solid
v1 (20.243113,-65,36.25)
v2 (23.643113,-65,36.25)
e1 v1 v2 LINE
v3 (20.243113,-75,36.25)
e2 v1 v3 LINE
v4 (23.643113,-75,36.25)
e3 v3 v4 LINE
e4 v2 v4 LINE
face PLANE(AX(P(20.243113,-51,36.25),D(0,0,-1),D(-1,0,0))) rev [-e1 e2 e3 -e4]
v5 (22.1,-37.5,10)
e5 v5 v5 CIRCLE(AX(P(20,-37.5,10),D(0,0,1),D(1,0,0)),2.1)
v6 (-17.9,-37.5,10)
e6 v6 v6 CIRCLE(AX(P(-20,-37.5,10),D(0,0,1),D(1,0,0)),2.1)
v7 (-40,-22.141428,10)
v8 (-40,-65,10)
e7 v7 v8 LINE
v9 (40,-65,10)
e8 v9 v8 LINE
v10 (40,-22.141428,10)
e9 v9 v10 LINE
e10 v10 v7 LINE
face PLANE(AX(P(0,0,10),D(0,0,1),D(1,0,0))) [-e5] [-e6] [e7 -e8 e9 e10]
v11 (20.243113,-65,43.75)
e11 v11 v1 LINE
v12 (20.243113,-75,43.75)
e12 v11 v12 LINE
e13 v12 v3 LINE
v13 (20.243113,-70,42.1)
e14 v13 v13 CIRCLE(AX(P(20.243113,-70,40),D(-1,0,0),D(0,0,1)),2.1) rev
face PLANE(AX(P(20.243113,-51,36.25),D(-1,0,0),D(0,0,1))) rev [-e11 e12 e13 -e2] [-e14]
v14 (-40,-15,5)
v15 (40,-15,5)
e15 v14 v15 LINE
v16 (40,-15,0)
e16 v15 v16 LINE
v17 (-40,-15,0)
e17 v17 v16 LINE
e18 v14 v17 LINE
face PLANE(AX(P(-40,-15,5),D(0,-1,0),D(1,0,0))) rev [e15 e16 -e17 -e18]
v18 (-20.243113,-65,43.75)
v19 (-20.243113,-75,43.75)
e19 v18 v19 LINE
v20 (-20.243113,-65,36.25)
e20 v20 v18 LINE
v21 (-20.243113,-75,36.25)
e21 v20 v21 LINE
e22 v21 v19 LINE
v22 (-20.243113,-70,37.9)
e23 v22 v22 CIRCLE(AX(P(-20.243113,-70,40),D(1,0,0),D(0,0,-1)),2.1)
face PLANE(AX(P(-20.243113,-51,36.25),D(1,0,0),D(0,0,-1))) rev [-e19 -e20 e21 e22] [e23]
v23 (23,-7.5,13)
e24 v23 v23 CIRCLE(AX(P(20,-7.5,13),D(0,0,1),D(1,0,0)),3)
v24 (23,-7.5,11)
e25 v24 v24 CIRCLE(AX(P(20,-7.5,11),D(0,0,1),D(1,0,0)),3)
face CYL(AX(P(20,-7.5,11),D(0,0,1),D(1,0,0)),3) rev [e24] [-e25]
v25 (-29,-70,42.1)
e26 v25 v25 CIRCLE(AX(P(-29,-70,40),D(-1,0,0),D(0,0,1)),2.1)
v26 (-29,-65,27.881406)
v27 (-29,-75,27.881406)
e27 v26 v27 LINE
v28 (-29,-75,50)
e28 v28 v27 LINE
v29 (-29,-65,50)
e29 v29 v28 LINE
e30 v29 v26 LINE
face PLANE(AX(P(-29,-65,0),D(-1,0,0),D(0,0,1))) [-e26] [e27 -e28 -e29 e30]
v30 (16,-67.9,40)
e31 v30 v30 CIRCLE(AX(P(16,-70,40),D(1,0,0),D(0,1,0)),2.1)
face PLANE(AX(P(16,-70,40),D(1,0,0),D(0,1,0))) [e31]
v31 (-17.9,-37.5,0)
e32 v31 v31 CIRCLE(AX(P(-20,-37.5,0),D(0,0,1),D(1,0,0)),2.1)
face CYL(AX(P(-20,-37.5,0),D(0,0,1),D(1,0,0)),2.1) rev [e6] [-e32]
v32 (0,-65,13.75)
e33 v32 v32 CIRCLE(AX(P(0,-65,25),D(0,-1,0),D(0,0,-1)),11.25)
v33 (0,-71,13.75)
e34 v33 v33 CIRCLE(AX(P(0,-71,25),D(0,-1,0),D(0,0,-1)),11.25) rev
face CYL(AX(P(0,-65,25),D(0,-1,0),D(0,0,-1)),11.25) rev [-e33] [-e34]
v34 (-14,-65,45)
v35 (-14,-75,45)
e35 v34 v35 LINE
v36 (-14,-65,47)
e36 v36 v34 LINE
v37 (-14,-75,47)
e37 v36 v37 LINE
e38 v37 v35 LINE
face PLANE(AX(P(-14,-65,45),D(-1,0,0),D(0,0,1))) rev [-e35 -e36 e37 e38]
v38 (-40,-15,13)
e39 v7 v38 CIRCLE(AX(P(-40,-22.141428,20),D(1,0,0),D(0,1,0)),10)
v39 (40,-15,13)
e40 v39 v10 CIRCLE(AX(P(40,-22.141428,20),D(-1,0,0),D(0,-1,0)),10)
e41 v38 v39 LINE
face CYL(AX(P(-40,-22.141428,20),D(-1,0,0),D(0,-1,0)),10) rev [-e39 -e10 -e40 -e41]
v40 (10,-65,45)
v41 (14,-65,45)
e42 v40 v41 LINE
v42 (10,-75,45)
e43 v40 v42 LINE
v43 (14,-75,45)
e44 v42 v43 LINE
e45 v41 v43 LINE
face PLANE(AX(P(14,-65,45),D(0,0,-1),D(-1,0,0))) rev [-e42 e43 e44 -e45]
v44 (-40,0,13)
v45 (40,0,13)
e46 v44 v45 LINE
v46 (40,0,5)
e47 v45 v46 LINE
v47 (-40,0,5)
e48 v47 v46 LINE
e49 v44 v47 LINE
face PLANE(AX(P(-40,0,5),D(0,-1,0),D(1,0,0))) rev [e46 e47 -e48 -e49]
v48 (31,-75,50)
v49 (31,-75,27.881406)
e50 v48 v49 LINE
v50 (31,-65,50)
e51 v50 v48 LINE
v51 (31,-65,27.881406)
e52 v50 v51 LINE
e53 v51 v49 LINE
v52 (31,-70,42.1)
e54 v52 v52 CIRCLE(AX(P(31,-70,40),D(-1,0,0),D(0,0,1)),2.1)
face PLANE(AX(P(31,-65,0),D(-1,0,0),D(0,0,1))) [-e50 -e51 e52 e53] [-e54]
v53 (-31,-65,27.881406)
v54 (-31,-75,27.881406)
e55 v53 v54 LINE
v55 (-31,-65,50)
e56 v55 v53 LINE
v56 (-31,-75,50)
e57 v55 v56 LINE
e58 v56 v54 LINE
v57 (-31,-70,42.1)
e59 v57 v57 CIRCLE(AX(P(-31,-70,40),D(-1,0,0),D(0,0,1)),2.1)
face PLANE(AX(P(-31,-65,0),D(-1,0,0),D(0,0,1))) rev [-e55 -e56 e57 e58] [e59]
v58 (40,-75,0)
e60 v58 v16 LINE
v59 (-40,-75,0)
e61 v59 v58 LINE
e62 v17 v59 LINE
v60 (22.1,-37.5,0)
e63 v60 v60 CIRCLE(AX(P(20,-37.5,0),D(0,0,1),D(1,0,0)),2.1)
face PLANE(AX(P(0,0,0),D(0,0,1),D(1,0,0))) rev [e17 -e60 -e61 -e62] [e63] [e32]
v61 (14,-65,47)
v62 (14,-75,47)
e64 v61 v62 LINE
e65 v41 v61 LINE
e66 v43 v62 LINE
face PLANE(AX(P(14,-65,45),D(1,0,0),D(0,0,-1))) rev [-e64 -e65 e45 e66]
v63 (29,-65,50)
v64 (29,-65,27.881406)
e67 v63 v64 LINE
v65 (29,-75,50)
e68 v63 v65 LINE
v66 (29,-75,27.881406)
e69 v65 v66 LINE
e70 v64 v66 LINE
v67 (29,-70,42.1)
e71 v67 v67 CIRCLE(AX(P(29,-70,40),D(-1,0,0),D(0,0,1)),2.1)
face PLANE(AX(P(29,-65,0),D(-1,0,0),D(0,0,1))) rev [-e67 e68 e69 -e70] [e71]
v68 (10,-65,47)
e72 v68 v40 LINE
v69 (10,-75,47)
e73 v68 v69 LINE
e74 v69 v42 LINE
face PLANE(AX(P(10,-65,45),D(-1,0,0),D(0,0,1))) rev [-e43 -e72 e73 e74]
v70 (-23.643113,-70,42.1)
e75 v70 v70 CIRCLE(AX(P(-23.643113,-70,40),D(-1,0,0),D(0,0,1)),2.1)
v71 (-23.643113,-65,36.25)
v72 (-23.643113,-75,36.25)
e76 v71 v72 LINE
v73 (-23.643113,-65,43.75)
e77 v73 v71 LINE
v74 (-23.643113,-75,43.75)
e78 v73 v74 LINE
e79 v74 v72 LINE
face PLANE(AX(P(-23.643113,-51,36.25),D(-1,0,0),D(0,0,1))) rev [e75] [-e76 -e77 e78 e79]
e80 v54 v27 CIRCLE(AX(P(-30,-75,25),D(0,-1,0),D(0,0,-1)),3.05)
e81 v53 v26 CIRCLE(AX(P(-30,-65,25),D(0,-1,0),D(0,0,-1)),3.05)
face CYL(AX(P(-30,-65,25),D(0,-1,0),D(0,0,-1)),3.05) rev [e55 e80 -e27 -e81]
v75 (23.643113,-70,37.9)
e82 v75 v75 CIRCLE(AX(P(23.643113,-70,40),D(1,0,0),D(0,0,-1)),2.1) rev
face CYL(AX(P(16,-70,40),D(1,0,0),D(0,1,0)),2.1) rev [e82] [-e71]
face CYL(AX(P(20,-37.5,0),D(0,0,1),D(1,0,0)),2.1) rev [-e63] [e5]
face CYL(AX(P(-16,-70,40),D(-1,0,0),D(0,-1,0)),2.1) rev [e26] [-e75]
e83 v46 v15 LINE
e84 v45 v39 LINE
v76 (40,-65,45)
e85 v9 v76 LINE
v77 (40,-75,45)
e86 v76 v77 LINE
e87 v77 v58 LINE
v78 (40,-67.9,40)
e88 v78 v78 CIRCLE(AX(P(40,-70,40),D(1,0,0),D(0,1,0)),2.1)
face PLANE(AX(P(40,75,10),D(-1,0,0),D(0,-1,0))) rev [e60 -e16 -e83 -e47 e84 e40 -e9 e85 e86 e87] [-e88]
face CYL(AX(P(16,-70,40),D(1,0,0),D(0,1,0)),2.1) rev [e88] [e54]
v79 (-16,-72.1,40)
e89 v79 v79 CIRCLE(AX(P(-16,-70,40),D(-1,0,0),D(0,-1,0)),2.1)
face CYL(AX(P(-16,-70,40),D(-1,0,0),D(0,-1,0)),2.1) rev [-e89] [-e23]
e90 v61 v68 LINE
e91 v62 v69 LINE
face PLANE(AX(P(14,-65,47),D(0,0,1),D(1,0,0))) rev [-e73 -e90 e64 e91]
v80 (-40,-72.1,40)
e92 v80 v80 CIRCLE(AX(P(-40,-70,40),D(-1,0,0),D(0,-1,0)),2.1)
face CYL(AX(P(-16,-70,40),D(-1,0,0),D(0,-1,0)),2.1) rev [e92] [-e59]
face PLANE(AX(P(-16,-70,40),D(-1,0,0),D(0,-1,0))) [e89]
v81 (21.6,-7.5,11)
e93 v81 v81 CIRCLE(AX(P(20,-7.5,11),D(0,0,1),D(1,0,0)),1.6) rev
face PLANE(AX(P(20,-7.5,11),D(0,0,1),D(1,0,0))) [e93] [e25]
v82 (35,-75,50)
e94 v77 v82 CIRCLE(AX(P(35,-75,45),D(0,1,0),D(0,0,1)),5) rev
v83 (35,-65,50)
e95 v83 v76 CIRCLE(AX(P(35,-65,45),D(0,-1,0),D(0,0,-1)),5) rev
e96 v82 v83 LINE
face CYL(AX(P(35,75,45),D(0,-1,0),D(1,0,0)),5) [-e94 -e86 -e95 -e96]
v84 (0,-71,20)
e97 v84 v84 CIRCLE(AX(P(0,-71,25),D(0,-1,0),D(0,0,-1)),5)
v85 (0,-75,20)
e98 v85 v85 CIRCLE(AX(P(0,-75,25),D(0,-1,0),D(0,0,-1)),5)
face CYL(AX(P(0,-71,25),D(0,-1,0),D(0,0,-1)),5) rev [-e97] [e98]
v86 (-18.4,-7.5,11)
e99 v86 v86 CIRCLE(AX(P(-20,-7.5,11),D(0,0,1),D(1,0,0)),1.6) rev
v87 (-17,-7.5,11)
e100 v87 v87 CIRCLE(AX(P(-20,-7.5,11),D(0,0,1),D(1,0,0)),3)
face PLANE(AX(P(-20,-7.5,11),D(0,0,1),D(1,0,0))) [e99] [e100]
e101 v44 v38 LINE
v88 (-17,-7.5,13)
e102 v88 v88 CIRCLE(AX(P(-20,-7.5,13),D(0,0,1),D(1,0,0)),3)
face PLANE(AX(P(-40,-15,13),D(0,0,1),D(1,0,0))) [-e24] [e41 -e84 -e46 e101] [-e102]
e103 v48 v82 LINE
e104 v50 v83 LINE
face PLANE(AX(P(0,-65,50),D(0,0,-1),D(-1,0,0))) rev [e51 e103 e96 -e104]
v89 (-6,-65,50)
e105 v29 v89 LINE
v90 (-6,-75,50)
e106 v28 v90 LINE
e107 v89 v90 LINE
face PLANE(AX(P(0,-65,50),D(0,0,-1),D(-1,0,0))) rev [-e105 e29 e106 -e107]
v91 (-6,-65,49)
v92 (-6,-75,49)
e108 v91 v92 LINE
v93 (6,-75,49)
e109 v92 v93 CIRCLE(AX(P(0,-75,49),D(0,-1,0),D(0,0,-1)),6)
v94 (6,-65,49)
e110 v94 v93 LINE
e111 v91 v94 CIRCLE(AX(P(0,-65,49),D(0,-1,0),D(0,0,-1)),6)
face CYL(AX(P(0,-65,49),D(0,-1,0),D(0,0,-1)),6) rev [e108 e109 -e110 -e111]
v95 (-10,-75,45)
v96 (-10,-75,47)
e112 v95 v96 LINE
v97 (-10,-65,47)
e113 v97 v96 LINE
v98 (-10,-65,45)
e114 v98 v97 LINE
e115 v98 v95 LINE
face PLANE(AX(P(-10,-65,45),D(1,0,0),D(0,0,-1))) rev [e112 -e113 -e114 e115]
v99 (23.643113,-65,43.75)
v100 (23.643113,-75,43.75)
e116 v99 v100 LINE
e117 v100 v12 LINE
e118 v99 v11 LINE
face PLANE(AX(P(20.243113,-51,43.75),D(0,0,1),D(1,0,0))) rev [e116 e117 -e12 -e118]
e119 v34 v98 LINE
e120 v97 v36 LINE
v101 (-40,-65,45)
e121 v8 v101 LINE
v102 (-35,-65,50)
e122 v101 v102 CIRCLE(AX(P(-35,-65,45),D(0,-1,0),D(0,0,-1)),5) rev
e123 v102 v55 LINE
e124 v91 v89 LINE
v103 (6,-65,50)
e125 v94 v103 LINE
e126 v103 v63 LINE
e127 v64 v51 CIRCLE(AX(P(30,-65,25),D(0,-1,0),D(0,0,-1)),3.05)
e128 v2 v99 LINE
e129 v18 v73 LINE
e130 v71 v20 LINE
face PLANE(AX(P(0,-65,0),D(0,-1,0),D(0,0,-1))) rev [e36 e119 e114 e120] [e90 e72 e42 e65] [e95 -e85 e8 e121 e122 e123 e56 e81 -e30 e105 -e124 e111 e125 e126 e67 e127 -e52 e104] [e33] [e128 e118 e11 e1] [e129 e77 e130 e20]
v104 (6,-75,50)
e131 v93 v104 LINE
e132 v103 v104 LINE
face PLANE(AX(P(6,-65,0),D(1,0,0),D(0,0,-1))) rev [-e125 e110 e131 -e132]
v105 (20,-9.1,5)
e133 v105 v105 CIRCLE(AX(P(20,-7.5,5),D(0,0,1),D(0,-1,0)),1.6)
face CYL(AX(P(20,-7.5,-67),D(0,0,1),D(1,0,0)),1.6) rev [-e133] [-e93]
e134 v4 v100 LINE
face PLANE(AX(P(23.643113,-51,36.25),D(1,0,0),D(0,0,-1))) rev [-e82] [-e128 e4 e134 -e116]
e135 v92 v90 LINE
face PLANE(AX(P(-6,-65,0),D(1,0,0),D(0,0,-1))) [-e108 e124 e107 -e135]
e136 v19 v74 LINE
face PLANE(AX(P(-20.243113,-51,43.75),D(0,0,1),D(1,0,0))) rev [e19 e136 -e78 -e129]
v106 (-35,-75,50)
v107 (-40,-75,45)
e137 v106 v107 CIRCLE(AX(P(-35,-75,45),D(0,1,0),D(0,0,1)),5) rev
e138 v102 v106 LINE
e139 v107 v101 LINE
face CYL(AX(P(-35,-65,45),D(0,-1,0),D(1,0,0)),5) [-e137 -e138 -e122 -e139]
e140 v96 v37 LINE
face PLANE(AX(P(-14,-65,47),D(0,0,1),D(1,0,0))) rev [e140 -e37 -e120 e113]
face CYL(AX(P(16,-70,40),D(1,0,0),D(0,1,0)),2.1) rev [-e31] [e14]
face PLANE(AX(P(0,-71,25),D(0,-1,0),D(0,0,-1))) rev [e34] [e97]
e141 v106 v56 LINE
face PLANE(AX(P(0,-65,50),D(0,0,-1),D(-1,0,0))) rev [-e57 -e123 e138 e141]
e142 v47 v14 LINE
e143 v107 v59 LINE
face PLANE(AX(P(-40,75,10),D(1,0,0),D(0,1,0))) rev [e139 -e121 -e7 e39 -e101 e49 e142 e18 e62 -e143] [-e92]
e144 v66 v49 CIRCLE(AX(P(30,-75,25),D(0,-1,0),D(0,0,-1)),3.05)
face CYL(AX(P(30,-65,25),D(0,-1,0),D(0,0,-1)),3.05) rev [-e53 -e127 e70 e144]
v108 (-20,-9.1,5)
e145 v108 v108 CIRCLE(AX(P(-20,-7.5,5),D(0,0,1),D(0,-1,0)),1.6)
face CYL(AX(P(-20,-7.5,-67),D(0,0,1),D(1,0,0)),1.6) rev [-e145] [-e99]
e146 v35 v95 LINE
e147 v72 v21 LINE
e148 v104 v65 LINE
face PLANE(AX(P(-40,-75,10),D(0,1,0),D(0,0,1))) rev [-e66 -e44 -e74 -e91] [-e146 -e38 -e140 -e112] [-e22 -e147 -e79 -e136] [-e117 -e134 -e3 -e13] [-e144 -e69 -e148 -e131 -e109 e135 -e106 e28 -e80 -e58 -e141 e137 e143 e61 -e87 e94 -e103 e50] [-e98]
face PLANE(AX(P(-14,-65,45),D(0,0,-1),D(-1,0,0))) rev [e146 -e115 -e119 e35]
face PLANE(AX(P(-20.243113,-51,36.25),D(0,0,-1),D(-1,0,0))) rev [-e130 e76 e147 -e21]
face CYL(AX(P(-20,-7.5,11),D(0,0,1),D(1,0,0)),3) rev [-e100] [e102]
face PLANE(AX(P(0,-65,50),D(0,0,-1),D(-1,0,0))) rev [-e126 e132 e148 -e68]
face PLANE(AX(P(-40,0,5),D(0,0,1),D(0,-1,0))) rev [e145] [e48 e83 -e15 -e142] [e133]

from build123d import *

# Parameters (mm, degrees)
SKETCH_1_W           = 80
SKETCH_1_H           = 150
EXTRUDE_1_DEPTH      = 10
SKETCH_4_R           = 11.25
EXTRUDE_3_DEPTH      = 10
SKETCH_5_R           = 11.25
SKETCH_5_R_2         = 5
EXTRUDE_4_DEPTH      = 4
SKETCH_6_R           = 2.1
CUT_EXTRUDE_1_DEPTH  = 24
SKETCH_7_W           = 3.4
SKETCH_7_H           = 7.5
CUT_EXTRUDE_2_DEPTH  = 24
CUT_EXTRUDE_START    = -24
SKETCH_8_R           = 2.1
CUT_EXTRUDE_3_DEPTH  = 24
SKETCH_9_W           = 80
SKETCH_9_H           = 40
SKETCH_9_R           = 11
SKETCH_9_R_2         = 1.6
EXTRUDE_5_DEPTH      = 10
FILLET_1_R           = 5
CUT_EXTRUDE_START_2  = -10
SKETCH_10_W          = 3.4
SKETCH_10_H          = 7.5
CUT_EXTRUDE_5_DEPTH  = 10
SKETCH_11_R          = 2.1
CUT_EXTRUDE_6_DEPTH  = 24
SKETCH_12_R          = 2.1
CUT_EXTRUDE_7_DEPTH  = 24
SKETCH_14_W          = 4
SKETCH_14_H          = 2
CUT_EXTRUDE_9_DEPTH  = 10
SKETCH_16_R          = 2.1
CUT_EXTRUDE_10_DEPTH = 94.94147114
CUT_EXTRUDE_11_DEPTH = 121.519707932
SKETCH_18_W          = 3
SKETCH_18_H          = 15
EXTRUDE_7_DEPTH      = 80
FILLET_2_R           = 10
SKETCH_19_R          = 1.6
CUT_EXTRUDE_12_DEPTH = 80
SKETCH_20_R          = 3
CUT_EXTRUDE_13_DEPTH = 2


with BuildPart() as part:
    # 草圖1 → 填料-伸長1 (new body)
    with BuildSketch(Plane.XY):
        Rectangle(SKETCH_1_W, SKETCH_1_H)
    extrude(amount=EXTRUDE_1_DEPTH)

    # 草圖4 → 填料-伸長3 (add)
    with BuildSketch(Plane.XZ.offset(75)):
        with BuildLine():
            ThreePointArc((-6, 49), (0, 43), (6, 49))
            Line((6, 49), (6, 50))
            Line((6, 50), (29, 50))
            Line((29, 50), (29, 27.881405907))
            ThreePointArc((29, 27.881405907), (30, 21.95), (31, 27.881405907))
            Line((31, 27.881405907), (31, 50))
            Line((31, 50), (40, 50))
            Line((40, 50), (40, 10))
            Line((40, 10), (-40, 10))
            Line((-40, 10), (-40, 50))
            Line((-40, 50), (-31, 50))
            Line((-31, 50), (-31, 27.881405907))
            ThreePointArc((-31, 27.881405907), (-30, 21.95), (-29, 27.881405907))
            Line((-29, 27.881405907), (-29, 50))
            Line((-29, 50), (-6, 50))
            Line((-6, 50), (-6, 49))
        make_face()
        with Locations(Location((0, 25, 0), (0, 0, 270))):
            Circle(SKETCH_4_R, mode=Mode.SUBTRACT)
    extrude(amount=-EXTRUDE_3_DEPTH)

    # 草圖5 → 填料-伸長4 (add)
    with BuildSketch(Plane.XZ.offset(75)):
        with Locations(Location((0, 25, 0), (0, 0, 270))):
            Circle(SKETCH_5_R)
        with Locations(Location((0, 25, 0), (0, 0, 270))):
            Circle(SKETCH_5_R_2, mode=Mode.SUBTRACT)
    extrude(amount=-EXTRUDE_4_DEPTH)

    # 草圖6 → 除料-伸長1 (cut)
    with BuildSketch(Plane(origin=(40, 0, 0), x_dir=(0, 0, -1), z_dir=(1, 0, 0))):
        with Locations(Location((-40, -70, 0), (0, 0, 90))):
            Circle(SKETCH_6_R)
    extrude(amount=-CUT_EXTRUDE_1_DEPTH, mode=Mode.SUBTRACT)

    # 草圖7 → 除料-伸長2 (cut)
    with BuildSketch(Plane.XZ.offset(75)):
        with Locations((-21.943112787, 40)):
            Rectangle(SKETCH_7_W, SKETCH_7_H)
        with Locations((21.943112787, 40)):
            Rectangle(SKETCH_7_W, SKETCH_7_H)
    extrude(amount=-CUT_EXTRUDE_2_DEPTH, mode=Mode.SUBTRACT)

    # 草圖8 → 除料-伸長3 (cut)
    with BuildSketch(Plane.ZY.offset(40).offset(CUT_EXTRUDE_START)):
        with Locations(Location((40, -70, 0), (0, 0, 180))):
            Circle(SKETCH_8_R)
    extrude(amount=CUT_EXTRUDE_3_DEPTH, mode=Mode.SUBTRACT)

    # 草圖9 → 填料-伸長5 (add)
    with BuildSketch(Plane(origin=(0, 75, 0), x_dir=(1, 0, 0), z_dir=(0, 1, 0))):
        with Locations((0, -30)):
            Rectangle(SKETCH_9_W, SKETCH_9_H)
        with Locations(Location((0, -25, 0), (0, 0, 270))):
            Circle(SKETCH_9_R, mode=Mode.SUBTRACT)
        with Locations(Location((-21.920310217, -25, 0), (0, 0, 270))):
            Circle(SKETCH_9_R_2, mode=Mode.SUBTRACT)
        with Locations(Location((0, -46.920310217, 0), (0, 0, 270))):
            Circle(SKETCH_9_R_2, mode=Mode.SUBTRACT)
        with Locations(Location((21.920310217, -25, 0), (0, 0, 270))):
            Circle(SKETCH_9_R_2, mode=Mode.SUBTRACT)
    extrude(amount=-EXTRUDE_5_DEPTH)

    # 圓角1
    fillet_1_edges = [part.edges().sort_by_distance(p)[0] for p in [
        (40, 70, 50),
        (-40, 70, 50),
        (40, -70, 50),
        (-40, -70, 50),
    ]]
    fillet(fillet_1_edges, radius=FILLET_1_R)

    # 草圖10 → 除料-伸長5 (cut)
    with BuildSketch(Plane(origin=(0, 75, 0), x_dir=(1, 0, 0), z_dir=(0, 1, 0)).offset(CUT_EXTRUDE_START_2)):
        with BuildLine():
            Line((-30.992105359, -72.117230176), (-29, -72.117230176))
            Line((-29, -72.117230176), (-29, -27.881405907))
            ThreePointArc((-29, -27.881405907), (-30.004176302, -21.950002859), (-30.992105359, -27.884133658))
            Line((-30.992105359, -27.884133658), (-30.992105359, -72.117230176))
        make_face()
        with BuildLine():
            Line((29.001577897, -72.118320527), (31, -72.118320527))
            Line((31, -72.118320527), (31, -27.881405907))
            ThreePointArc((31, -27.881405907), (29.999164969, -21.950000114), (29.001577897, -27.881953036))
            Line((29.001577897, -27.881953036), (29.001577897, -72.118320527))
        make_face()
        with Locations((-21.943112787, -40)):
            Rectangle(SKETCH_10_W, SKETCH_10_H)
        with Locations((21.943112787, -40)):
            Rectangle(SKETCH_10_W, SKETCH_10_H)
    extrude(amount=CUT_EXTRUDE_5_DEPTH, mode=Mode.SUBTRACT)

    # 草圖11 → 除料-伸長6 (cut)
    with BuildSketch(Plane(origin=(40, 0, 0), x_dir=(0, 0, -1), z_dir=(1, 0, 0))):
        with Locations((-40, 70)):
            Circle(SKETCH_11_R)
    extrude(amount=-CUT_EXTRUDE_6_DEPTH, mode=Mode.SUBTRACT)

    # 草圖12 → 除料-伸長7 (cut)
    with BuildSketch(Plane.ZY.offset(40).offset(CUT_EXTRUDE_START)):
        with Locations(Location((40, 70, 0), (0, 0, 180))):
            Circle(SKETCH_12_R)
    extrude(amount=CUT_EXTRUDE_7_DEPTH, mode=Mode.SUBTRACT)

    # 草圖14 → 除料-伸長9 (cut)
    with BuildSketch(Plane.XZ.offset(75)):
        with Locations((-12, 46)):
            Rectangle(SKETCH_14_W, SKETCH_14_H)
        with Locations((12, 46)):
            Rectangle(SKETCH_14_W, SKETCH_14_H)
    extrude(amount=-CUT_EXTRUDE_9_DEPTH, mode=Mode.SUBTRACT)

    # 草圖16 → 除料-伸長10 (cut, through all)
    with BuildSketch(Plane.XY.offset(10)):
        with Locations((-20, 37.5)):
            Circle(SKETCH_16_R)
        with Locations((20, 37.5)):
            Circle(SKETCH_16_R)
        with Locations((20, -37.5)):
            Circle(SKETCH_16_R)
        with Locations((-20, -37.5)):
            Circle(SKETCH_16_R)
    extrude(amount=-CUT_EXTRUDE_10_DEPTH, mode=Mode.SUBTRACT)

    # 草圖17 → 除料-伸長11 (cut, through all)
    with BuildSketch(Plane(origin=(40, 0, 0), x_dir=(0, 0, -1), z_dir=(1, 0, 0))):
        Polygon((-5, 0), (-5, -15), (0, -15), (0, 75), (-50, 75), (-50, 65), (-10, 65), (-10, 0), align=None)
    extrude(amount=-CUT_EXTRUDE_11_DEPTH, mode=Mode.SUBTRACT)

    # 草圖18 → 填料-伸長7 (add)
    with BuildSketch(Plane(origin=(40, 0, 0), x_dir=(0, 0, -1), z_dir=(1, 0, 0))):
        with Locations((-11.5, -7.5)):
            Rectangle(SKETCH_18_W, SKETCH_18_H)
    extrude(amount=-EXTRUDE_7_DEPTH)

    # 圓角2
    # the kernel refuses this fillet: 10 mm, written as the material it adds along each edge
    with BuildSketch(Plane(origin=(40, -15, 10), x_dir=(0, 0, 1), z_dir=(-1, 0, 0))) as fillet_2_piece_1:
        with BuildLine():
            CenterArc((10, -7.141428429), FILLET_2_R, 134.427004001, 45.572995999)
            Line((0, -7.141428429), (-0.2, -7.141428429))
            Line((-0.2, -7.141428429), (-0.2, 0))
            Line((-0.2, 0), (0, 0.2))
            ThreePointArc((0, 0.2), (1.5, 0.2), (2.86, 0.142828569))
            Line((2.86, 0.142828569), (3, 0))
        make_face()
    extrude(amount=80)

    # 草圖19 → 除料-伸長12 (cut)
    with BuildSketch(Plane.XY.offset(13)):
        with Locations((-20, -7.5)):
            Circle(SKETCH_19_R)
        with Locations(Location((20, -7.5, 0), (0, 0, 270))):
            Circle(SKETCH_19_R)
    extrude(amount=-CUT_EXTRUDE_12_DEPTH, mode=Mode.SUBTRACT)

    # 草圖20 → 除料-伸長13 (cut)
    with BuildSketch(Plane.XY.offset(13)):
        with Locations((-20, -7.5)):
            Circle(SKETCH_20_R)
        with Locations((20, -7.5)):
            Circle(SKETCH_20_R)
    extrude(amount=-CUT_EXTRUDE_13_DEPTH, mode=Mode.SUBTRACT)


solid = part.part
